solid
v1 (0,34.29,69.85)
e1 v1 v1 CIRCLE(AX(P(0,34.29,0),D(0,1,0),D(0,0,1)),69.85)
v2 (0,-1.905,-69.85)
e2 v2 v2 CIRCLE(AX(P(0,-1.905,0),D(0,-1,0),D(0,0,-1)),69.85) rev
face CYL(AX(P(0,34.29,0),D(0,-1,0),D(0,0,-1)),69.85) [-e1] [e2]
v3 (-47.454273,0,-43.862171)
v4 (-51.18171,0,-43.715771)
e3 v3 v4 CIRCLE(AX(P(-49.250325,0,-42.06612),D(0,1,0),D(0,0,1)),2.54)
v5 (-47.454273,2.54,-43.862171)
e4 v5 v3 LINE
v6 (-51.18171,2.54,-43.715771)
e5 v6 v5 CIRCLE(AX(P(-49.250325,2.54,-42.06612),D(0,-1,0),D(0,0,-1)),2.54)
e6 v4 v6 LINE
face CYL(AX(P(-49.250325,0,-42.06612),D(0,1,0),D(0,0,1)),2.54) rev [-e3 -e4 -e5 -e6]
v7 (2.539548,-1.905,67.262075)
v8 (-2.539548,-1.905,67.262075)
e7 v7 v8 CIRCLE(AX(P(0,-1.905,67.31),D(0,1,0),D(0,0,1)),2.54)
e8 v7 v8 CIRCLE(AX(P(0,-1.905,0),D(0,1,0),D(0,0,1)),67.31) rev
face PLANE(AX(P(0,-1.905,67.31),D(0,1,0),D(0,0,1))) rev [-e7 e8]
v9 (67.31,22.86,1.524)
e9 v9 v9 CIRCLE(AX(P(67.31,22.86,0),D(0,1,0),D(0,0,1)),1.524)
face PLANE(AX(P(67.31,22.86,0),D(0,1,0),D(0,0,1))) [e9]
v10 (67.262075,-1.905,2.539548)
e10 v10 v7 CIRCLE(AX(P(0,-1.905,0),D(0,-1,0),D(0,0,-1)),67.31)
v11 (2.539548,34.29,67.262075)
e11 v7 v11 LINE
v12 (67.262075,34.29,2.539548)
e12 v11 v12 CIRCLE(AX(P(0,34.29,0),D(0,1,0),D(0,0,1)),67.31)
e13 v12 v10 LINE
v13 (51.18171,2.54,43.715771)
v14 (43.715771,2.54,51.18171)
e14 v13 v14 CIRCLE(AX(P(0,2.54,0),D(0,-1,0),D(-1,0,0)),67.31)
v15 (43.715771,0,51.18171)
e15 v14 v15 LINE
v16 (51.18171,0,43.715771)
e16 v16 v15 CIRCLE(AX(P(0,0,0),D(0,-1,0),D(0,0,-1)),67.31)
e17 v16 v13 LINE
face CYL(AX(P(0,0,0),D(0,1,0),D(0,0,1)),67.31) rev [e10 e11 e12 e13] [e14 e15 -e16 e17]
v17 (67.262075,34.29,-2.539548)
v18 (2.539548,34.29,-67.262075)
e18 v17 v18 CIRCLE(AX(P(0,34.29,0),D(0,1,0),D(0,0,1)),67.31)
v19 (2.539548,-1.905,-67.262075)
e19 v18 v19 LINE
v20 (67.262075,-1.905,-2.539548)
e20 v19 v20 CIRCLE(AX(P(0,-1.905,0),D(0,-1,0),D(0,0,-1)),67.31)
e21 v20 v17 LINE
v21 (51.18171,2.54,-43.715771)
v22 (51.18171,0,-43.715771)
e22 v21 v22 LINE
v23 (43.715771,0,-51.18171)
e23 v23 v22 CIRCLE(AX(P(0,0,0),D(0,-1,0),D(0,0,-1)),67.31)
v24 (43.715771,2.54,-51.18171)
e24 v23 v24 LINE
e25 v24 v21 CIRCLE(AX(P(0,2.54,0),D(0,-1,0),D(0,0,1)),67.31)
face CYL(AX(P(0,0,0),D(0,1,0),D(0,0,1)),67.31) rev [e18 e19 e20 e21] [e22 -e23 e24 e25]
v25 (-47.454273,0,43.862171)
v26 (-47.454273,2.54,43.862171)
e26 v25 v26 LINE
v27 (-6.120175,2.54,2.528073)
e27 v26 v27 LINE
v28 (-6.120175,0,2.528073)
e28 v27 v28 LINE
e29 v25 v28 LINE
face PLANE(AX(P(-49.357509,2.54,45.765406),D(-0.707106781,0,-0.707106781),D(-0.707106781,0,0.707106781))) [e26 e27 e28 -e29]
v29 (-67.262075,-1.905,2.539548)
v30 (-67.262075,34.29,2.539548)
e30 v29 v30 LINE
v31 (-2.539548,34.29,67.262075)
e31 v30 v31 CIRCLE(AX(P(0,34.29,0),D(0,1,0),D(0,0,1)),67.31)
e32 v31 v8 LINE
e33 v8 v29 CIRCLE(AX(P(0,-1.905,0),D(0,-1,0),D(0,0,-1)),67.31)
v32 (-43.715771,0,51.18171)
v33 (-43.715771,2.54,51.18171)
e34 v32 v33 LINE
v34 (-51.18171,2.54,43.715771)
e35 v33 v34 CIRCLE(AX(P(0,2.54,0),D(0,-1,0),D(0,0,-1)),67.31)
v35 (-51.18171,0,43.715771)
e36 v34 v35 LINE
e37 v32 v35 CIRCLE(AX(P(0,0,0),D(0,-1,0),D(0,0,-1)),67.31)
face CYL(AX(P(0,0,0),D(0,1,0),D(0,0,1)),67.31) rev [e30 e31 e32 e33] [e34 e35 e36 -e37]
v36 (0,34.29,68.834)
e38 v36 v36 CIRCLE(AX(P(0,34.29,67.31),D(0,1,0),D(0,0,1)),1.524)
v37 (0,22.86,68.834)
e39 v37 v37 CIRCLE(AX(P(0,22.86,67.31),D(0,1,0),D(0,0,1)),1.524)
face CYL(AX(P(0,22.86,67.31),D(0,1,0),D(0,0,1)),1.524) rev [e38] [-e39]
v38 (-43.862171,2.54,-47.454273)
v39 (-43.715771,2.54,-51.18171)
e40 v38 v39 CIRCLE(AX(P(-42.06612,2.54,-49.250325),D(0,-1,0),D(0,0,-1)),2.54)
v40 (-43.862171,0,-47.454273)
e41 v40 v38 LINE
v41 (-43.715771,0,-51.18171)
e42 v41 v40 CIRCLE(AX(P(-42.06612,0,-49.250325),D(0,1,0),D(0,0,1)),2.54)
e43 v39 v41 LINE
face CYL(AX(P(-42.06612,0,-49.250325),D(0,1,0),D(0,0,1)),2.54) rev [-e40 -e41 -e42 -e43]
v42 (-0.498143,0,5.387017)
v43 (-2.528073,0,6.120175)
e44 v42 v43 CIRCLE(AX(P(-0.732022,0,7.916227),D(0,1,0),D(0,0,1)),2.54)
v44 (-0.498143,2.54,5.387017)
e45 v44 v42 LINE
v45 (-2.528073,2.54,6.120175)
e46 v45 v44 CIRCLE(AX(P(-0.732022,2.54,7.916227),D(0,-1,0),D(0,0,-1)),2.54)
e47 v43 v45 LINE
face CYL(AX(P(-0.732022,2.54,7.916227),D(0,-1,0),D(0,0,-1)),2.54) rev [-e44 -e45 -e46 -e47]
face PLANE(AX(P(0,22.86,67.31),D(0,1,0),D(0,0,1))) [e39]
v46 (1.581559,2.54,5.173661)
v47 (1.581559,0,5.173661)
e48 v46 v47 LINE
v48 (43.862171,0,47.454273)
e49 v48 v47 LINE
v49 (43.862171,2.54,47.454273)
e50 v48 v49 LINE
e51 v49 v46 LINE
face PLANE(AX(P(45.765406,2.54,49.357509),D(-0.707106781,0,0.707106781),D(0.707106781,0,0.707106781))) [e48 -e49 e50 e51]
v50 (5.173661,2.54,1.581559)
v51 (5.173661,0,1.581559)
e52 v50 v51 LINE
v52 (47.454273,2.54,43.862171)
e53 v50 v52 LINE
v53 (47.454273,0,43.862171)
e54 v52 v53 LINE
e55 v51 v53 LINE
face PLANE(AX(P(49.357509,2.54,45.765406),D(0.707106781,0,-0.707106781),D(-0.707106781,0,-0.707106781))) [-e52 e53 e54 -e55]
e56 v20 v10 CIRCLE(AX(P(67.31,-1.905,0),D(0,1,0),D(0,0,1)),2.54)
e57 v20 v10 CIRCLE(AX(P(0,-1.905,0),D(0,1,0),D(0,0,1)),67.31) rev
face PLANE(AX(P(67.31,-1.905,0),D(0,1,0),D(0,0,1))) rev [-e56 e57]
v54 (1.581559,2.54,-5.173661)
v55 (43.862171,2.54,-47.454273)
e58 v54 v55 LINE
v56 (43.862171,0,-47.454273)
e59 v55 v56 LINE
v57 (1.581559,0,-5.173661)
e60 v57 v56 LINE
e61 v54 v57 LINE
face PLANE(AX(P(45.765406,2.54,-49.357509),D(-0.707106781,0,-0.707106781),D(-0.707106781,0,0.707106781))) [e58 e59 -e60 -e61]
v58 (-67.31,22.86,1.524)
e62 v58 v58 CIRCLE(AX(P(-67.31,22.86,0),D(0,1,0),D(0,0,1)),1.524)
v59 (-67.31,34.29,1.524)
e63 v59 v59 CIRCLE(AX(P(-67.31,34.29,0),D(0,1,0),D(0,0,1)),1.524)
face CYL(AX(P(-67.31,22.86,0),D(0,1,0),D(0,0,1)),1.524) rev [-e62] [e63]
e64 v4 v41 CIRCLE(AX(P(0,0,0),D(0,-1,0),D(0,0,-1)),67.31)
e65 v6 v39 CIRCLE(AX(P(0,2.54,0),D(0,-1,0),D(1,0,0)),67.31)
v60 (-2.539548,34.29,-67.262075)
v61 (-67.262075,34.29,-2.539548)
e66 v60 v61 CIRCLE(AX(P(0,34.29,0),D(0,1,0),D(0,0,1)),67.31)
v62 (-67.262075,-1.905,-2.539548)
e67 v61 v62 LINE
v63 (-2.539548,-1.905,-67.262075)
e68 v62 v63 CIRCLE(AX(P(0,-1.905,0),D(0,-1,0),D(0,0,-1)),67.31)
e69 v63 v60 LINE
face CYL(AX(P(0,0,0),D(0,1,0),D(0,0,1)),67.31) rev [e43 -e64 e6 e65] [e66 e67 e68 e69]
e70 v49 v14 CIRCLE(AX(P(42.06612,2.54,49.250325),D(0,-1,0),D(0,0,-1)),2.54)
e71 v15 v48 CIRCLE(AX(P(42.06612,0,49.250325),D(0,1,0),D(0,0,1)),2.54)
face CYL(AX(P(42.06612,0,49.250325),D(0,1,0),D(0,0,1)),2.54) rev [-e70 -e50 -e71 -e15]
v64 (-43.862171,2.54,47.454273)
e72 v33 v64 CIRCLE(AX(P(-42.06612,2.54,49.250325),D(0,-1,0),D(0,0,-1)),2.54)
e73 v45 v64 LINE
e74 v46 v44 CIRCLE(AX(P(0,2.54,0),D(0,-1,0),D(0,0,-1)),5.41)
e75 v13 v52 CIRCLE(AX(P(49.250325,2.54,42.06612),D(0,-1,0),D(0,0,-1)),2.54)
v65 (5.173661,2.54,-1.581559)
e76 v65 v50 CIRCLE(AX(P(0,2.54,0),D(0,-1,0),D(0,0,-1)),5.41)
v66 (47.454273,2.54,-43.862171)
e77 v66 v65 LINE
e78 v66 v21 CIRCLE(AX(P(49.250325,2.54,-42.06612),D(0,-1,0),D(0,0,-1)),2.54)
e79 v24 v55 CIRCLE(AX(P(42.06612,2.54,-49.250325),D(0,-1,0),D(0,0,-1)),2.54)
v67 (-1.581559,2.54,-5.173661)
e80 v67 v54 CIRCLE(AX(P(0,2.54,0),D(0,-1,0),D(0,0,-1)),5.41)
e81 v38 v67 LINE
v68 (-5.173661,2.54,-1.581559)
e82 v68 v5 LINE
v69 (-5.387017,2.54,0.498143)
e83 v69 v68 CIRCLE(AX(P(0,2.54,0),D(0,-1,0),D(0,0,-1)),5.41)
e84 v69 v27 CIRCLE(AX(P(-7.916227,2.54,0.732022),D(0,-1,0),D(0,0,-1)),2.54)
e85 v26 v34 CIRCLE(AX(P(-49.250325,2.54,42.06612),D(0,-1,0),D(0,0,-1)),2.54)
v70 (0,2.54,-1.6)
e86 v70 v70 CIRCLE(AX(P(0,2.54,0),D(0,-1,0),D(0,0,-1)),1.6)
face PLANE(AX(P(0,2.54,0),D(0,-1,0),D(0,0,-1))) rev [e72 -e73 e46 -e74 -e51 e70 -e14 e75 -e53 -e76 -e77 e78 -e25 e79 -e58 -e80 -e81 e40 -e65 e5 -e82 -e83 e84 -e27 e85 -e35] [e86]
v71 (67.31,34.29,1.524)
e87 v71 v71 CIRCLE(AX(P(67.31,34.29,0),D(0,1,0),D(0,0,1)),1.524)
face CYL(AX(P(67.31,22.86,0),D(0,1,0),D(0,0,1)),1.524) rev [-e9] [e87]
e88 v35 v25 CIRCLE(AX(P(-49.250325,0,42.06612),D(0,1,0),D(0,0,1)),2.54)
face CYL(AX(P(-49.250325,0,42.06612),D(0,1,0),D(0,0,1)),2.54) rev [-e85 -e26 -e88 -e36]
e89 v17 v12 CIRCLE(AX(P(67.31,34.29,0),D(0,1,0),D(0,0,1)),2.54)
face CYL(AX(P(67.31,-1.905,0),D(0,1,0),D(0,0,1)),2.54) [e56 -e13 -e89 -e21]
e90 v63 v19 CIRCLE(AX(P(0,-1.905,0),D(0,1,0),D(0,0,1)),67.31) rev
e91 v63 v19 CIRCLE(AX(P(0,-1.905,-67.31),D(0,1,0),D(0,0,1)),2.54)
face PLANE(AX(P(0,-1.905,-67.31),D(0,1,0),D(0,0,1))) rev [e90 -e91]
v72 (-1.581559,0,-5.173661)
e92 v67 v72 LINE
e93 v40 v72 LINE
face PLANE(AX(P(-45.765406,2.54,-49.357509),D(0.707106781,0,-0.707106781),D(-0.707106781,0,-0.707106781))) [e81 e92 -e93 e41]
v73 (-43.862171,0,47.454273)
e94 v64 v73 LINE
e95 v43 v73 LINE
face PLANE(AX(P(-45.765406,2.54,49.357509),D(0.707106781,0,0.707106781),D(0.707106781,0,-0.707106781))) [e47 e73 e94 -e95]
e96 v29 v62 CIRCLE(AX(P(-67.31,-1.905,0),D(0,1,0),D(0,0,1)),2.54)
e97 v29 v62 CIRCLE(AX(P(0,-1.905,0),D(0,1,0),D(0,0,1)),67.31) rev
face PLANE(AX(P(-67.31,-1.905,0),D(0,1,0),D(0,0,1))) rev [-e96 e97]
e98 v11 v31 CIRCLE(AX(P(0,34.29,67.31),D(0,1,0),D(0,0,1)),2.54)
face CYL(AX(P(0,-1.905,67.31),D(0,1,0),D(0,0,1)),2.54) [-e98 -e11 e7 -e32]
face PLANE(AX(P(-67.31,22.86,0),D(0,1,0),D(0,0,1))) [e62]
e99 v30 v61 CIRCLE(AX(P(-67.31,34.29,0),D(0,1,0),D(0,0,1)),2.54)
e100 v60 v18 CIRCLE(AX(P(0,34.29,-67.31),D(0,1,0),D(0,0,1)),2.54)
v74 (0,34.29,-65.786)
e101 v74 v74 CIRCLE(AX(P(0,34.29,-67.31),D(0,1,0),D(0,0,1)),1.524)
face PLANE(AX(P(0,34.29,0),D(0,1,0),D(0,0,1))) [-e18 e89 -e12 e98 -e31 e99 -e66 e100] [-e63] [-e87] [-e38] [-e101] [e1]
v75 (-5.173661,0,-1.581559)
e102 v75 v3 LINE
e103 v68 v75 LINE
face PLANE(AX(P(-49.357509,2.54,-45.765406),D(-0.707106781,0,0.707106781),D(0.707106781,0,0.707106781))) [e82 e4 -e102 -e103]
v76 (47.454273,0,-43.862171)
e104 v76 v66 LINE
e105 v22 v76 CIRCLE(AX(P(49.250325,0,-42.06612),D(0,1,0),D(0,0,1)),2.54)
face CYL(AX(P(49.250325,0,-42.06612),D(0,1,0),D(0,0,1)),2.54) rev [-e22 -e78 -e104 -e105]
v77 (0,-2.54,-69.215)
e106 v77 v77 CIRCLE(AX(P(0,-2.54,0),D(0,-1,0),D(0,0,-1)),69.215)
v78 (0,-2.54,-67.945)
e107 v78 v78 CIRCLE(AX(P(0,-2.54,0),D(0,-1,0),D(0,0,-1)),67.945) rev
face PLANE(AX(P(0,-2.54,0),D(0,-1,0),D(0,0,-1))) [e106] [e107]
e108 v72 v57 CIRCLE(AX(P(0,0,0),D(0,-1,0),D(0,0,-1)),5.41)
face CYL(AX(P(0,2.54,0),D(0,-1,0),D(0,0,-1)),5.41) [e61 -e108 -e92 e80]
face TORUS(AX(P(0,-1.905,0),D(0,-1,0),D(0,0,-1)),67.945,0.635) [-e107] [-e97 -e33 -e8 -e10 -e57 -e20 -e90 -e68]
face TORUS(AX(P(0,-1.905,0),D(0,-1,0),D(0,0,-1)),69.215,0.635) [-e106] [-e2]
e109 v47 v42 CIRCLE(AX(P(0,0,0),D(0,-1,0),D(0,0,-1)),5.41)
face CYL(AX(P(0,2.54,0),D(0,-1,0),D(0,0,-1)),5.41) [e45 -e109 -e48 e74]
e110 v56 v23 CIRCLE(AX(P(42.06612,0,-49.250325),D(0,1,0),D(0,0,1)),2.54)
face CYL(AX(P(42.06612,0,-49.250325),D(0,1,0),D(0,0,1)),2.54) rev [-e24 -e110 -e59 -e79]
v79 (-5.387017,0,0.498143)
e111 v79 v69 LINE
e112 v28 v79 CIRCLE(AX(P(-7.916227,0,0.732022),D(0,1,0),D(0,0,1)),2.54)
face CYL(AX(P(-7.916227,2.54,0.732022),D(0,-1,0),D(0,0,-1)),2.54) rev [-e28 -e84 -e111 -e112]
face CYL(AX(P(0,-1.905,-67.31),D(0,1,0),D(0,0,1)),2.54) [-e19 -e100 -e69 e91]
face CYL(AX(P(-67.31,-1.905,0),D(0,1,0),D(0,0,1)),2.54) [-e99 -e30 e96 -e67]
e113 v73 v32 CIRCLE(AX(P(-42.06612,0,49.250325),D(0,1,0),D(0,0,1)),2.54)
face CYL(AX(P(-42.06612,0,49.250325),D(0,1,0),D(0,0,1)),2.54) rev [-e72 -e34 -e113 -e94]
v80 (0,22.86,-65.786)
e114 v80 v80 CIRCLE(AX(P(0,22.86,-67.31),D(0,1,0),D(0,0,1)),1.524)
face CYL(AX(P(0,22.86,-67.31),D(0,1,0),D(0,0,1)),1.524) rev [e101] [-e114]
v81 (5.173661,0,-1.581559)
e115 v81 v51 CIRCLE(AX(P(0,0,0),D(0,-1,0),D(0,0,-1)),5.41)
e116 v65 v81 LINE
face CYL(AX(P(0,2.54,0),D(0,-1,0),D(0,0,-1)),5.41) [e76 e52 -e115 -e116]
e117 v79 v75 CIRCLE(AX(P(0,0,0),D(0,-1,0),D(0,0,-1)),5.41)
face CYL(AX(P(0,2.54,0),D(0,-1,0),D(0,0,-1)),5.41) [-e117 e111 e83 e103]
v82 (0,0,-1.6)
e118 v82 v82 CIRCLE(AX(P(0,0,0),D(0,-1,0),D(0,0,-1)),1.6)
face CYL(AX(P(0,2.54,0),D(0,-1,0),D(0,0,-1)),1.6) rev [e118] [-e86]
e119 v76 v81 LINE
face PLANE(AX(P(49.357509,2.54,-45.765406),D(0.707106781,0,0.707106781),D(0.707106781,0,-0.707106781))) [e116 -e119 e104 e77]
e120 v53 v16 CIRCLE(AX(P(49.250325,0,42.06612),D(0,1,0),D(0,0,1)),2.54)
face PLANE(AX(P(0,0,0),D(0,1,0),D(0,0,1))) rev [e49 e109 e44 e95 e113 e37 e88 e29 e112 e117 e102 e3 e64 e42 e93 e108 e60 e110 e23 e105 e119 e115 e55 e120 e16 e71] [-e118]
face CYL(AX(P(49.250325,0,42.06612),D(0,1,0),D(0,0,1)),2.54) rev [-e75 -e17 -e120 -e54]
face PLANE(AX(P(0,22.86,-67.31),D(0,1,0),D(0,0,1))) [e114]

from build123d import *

# Parameters (mm, degrees)
SKETCH1_R           = 69.85
BOSS_EXTRUDE1_DEPTH = 34.29
SKETCH5_R           = 67.30999999999999
CUT_EXTRUDE1_DEPTH  = 105.56504721942221
SKETCH6_R           = 2.539999999999996
SKETCH6_R_2         = 2.5399999999999983
SKETCH6_R_3         = 2.5400000000000005
SKETCH6_R_4         = 2.53999999999999
BOSS_EXTRUDE3_DEPTH = 36.195
SKETCH12_R          = 1.523999999999992
SKETCH12_R_2        = 1.5239999999999905
SKETCH12_R_3        = 1.523999999999989
SKETCH12_R_4        = 1.5239999999999874
CUT_EXTRUDE3_DEPTH  = 11.43
BOSS_EXTRUDE4_START = -2.54
SKETCH13_R          = 1.599999999999998
BOSS_EXTRUDE4_DEPTH = 2.54
FILLET1_R           = 2.54
CIRPATTERN2_DEPTH   = 2.54
SKETCH14_R          = 69.85
SKETCH14_R_2        = 67.30999999999997
BOSS_EXTRUDE5_DEPTH = 2.54


with BuildPart() as part:
    # Sketch1 → Boss-Extrude1 (new body)
    with BuildSketch(Plane(origin=(0, 0, 0), x_dir=(1, 0, 0), z_dir=(0, 1, 0))):
        with Locations(Location((0, 0, 0), (0, 0, 270))):
            Circle(SKETCH1_R)
    extrude(amount=BOSS_EXTRUDE1_DEPTH)

    # Sketch5 → Cut-Extrude1 (cut, through all)
    with BuildSketch(Plane(origin=(0, 34.29, 0), x_dir=(1, 0, 0), z_dir=(0, 1, 0))):
        with Locations(Location((0, 0, 0), (0, 0, 270))):
            Circle(SKETCH5_R)
    extrude(amount=-CUT_EXTRUDE1_DEPTH, mode=Mode.SUBTRACT)

    # Sketch6 → Boss-Extrude3 (add)
    with BuildSketch(Plane(origin=(0, 34.29, 0), x_dir=(1, 0, 0), z_dir=(0, 1, 0))):
        with Locations(Location((67.30999999999999, 0, 0), (0, 0, 270))):
            Circle(SKETCH6_R)
        with Locations(Location((-2.3501e-13, 67.30999999999999, 0), (0, 0, 270))):
            Circle(SKETCH6_R_2)
        with Locations(Location((-67.30999999999999, -4.7002e-13, 0), (0, 0, 270))):
            Circle(SKETCH6_R_3)
        with Locations(Location((7.0503e-13, -67.30999999999999, 0), (0, 0, 270))):
            Circle(SKETCH6_R_4)
    extrude(amount=-BOSS_EXTRUDE3_DEPTH)

    # Sketch12 → Cut-Extrude3 (cut)
    with BuildSketch(Plane(origin=(0, 34.29, 0), x_dir=(1, 0, 0), z_dir=(0, 1, 0))):
        with Locations(Location((-67.30999999999999, 0, 0), (0, 0, 270))):
            Circle(SKETCH12_R)
        with Locations(Location((2.3501e-13, 67.30999999999999, 0), (0, 0, 270))):
            Circle(SKETCH12_R_2)
        with Locations(Location((67.30999999999999, -4.7002e-13, 0), (0, 0, 270))):
            Circle(SKETCH12_R_3)
        with Locations(Location((-7.0503e-13, -67.30999999999999, 0), (0, 0, 270))):
            Circle(SKETCH12_R_4)
    extrude(amount=-CUT_EXTRUDE3_DEPTH, mode=Mode.SUBTRACT)

    # Sketch13 → Boss-Extrude4 (add)
    with BuildSketch(Plane.XZ.offset(BOSS_EXTRUDE4_START)):
        with BuildLine():
            Line((-49.35750883434136, 45.76540638591458), (-5.173661326046175, 1.5815588776185732))
            ThreePointArc((-5.173661326046175, 1.5815588776185732), (3.825447686219193, -3.825447686219249), (-1.5815588776184986, 5.173661326046197))
            Line((-1.5815588776184986, 5.173661326046197), (-45.76540638591367, 49.35750883434221))
            ThreePointArc((-45.76540638591367, 49.35750883434221), (-47.59535744166605, 47.59535744166695), (-49.35750883434136, 45.76540638591458))
        make_face()
        with Locations(Location((0, 0, 0), (0, 0, 270))):
            Circle(SKETCH13_R, mode=Mode.SUBTRACT)
    extrude(amount=BOSS_EXTRUDE4_DEPTH)

    # Fillet1
    fillet1_edges = [part.edges().sort_by_distance(p)[0] for p in [
        (-49.35750883434137, 1.27, 45.76540638591459),
        (-45.76540638591368, 1.27, 49.35750883434221),
        (-1.5815588776184981, 1.27, 5.173661326046197),
        (-5.173661326046176, 1.27, 1.5815588776185734),
    ]]
    fillet(fillet1_edges, radius=FILLET1_R)

    # CirPattern2: read off the stored shape, not the designer's step
    # CirPattern2 outline → CirPattern2 (add)
    with BuildSketch(Plane(origin=(0, 0, 0), x_dir=(1, 0, 0), z_dir=(0, 1, 0))):
        with BuildLine():
            ThreePointArc((1.581558878, 5.173661326), (3.825447686, 3.825447686), (5.173661326, 1.581558878))
            Line((5.173661326, 1.581558878), (47.454273375, 43.862170927))
            ThreePointArc((47.454273375, 43.862170927), (49.350009241, 44.604162841), (51.181709878, 43.715771456))
            ThreePointArc((51.181709878, 43.715771456), (47.595357442, 47.595357442), (43.715771456, 51.181709878))
            ThreePointArc((43.715771456, 51.181709878), (44.604162841, 49.350009241), (43.862170927, 47.454273375))
            Line((43.862170927, 47.454273375), (1.581558878, 5.173661326))
        make_face()
        with BuildLine():
            ThreePointArc((-5.173661326, 1.581558878), (-3.825447686, 3.825447686), (-1.581558878, 5.173661326))
            Line((-1.581558878, 5.173661326), (-43.862170927, 47.454273375))
            ThreePointArc((-43.862170927, 47.454273375), (-44.604162841, 49.350009241), (-43.715771456, 51.181709878))
            ThreePointArc((-43.715771456, 51.181709878), (-47.595357442, 47.595357442), (-51.181709878, 43.715771456))
            ThreePointArc((-51.181709878, 43.715771456), (-49.350009241, 44.604162841), (-47.454273375, 43.862170927))
            Line((-47.454273375, 43.862170927), (-5.173661326, 1.581558878))
        make_face()
        with BuildLine():
            Line((47.454273375, -43.862170927), (5.173661326, -1.581558878))
            ThreePointArc((5.173661326, -1.581558878), (3.825447686, -3.825447686), (1.581558878, -5.173661326))
            Line((1.581558878, -5.173661326), (43.862170927, -47.454273375))
            ThreePointArc((43.862170927, -47.454273375), (44.604162841, -49.350009241), (43.715771456, -51.181709878))
            ThreePointArc((43.715771456, -51.181709878), (47.595357442, -47.595357442), (51.181709878, -43.715771456))
            ThreePointArc((51.181709878, -43.715771456), (49.350009241, -44.604162841), (47.454273375, -43.862170927))
        make_face()
    extrude(amount=CIRPATTERN2_DEPTH)

    # Sketch14 → Boss-Extrude5 (add)
    with BuildSketch(Plane.XZ):
        with Locations(Location((0, 0, 0), (0, 0, 270))):
            Circle(SKETCH14_R)
        with Locations(Location((0, 0, 0), (0, 0, 92.162233192))):
            Circle(SKETCH14_R_2, mode=Mode.SUBTRACT)
    extrude(amount=BOSS_EXTRUDE5_DEPTH)

    # Fillet2: read off the stored shape, not the designer's step
    # Fillet2 outline → Fillet2 (revolve, cut)
    with BuildSketch(Plane.XY):
        with BuildLine():
            Line((69.85, -2.54), (69.85, -1.905))
            ThreePointArc((69.85, -1.905), (69.664012806, -2.354012806), (69.215, -2.54))
            Line((69.215, -2.54), (69.85, -2.54))
        make_face()
        with BuildLine():
            Line((67.31, -2.54), (67.945, -2.54))
            ThreePointArc((67.945, -2.54), (67.495987194, -2.354012806), (67.31, -1.905))
            Line((67.31, -1.905), (67.31, -2.54))
        make_face()
    revolve(axis=Axis((0, 0, 0), (0, 1, 0)), mode=Mode.SUBTRACT)


solid = part.part
